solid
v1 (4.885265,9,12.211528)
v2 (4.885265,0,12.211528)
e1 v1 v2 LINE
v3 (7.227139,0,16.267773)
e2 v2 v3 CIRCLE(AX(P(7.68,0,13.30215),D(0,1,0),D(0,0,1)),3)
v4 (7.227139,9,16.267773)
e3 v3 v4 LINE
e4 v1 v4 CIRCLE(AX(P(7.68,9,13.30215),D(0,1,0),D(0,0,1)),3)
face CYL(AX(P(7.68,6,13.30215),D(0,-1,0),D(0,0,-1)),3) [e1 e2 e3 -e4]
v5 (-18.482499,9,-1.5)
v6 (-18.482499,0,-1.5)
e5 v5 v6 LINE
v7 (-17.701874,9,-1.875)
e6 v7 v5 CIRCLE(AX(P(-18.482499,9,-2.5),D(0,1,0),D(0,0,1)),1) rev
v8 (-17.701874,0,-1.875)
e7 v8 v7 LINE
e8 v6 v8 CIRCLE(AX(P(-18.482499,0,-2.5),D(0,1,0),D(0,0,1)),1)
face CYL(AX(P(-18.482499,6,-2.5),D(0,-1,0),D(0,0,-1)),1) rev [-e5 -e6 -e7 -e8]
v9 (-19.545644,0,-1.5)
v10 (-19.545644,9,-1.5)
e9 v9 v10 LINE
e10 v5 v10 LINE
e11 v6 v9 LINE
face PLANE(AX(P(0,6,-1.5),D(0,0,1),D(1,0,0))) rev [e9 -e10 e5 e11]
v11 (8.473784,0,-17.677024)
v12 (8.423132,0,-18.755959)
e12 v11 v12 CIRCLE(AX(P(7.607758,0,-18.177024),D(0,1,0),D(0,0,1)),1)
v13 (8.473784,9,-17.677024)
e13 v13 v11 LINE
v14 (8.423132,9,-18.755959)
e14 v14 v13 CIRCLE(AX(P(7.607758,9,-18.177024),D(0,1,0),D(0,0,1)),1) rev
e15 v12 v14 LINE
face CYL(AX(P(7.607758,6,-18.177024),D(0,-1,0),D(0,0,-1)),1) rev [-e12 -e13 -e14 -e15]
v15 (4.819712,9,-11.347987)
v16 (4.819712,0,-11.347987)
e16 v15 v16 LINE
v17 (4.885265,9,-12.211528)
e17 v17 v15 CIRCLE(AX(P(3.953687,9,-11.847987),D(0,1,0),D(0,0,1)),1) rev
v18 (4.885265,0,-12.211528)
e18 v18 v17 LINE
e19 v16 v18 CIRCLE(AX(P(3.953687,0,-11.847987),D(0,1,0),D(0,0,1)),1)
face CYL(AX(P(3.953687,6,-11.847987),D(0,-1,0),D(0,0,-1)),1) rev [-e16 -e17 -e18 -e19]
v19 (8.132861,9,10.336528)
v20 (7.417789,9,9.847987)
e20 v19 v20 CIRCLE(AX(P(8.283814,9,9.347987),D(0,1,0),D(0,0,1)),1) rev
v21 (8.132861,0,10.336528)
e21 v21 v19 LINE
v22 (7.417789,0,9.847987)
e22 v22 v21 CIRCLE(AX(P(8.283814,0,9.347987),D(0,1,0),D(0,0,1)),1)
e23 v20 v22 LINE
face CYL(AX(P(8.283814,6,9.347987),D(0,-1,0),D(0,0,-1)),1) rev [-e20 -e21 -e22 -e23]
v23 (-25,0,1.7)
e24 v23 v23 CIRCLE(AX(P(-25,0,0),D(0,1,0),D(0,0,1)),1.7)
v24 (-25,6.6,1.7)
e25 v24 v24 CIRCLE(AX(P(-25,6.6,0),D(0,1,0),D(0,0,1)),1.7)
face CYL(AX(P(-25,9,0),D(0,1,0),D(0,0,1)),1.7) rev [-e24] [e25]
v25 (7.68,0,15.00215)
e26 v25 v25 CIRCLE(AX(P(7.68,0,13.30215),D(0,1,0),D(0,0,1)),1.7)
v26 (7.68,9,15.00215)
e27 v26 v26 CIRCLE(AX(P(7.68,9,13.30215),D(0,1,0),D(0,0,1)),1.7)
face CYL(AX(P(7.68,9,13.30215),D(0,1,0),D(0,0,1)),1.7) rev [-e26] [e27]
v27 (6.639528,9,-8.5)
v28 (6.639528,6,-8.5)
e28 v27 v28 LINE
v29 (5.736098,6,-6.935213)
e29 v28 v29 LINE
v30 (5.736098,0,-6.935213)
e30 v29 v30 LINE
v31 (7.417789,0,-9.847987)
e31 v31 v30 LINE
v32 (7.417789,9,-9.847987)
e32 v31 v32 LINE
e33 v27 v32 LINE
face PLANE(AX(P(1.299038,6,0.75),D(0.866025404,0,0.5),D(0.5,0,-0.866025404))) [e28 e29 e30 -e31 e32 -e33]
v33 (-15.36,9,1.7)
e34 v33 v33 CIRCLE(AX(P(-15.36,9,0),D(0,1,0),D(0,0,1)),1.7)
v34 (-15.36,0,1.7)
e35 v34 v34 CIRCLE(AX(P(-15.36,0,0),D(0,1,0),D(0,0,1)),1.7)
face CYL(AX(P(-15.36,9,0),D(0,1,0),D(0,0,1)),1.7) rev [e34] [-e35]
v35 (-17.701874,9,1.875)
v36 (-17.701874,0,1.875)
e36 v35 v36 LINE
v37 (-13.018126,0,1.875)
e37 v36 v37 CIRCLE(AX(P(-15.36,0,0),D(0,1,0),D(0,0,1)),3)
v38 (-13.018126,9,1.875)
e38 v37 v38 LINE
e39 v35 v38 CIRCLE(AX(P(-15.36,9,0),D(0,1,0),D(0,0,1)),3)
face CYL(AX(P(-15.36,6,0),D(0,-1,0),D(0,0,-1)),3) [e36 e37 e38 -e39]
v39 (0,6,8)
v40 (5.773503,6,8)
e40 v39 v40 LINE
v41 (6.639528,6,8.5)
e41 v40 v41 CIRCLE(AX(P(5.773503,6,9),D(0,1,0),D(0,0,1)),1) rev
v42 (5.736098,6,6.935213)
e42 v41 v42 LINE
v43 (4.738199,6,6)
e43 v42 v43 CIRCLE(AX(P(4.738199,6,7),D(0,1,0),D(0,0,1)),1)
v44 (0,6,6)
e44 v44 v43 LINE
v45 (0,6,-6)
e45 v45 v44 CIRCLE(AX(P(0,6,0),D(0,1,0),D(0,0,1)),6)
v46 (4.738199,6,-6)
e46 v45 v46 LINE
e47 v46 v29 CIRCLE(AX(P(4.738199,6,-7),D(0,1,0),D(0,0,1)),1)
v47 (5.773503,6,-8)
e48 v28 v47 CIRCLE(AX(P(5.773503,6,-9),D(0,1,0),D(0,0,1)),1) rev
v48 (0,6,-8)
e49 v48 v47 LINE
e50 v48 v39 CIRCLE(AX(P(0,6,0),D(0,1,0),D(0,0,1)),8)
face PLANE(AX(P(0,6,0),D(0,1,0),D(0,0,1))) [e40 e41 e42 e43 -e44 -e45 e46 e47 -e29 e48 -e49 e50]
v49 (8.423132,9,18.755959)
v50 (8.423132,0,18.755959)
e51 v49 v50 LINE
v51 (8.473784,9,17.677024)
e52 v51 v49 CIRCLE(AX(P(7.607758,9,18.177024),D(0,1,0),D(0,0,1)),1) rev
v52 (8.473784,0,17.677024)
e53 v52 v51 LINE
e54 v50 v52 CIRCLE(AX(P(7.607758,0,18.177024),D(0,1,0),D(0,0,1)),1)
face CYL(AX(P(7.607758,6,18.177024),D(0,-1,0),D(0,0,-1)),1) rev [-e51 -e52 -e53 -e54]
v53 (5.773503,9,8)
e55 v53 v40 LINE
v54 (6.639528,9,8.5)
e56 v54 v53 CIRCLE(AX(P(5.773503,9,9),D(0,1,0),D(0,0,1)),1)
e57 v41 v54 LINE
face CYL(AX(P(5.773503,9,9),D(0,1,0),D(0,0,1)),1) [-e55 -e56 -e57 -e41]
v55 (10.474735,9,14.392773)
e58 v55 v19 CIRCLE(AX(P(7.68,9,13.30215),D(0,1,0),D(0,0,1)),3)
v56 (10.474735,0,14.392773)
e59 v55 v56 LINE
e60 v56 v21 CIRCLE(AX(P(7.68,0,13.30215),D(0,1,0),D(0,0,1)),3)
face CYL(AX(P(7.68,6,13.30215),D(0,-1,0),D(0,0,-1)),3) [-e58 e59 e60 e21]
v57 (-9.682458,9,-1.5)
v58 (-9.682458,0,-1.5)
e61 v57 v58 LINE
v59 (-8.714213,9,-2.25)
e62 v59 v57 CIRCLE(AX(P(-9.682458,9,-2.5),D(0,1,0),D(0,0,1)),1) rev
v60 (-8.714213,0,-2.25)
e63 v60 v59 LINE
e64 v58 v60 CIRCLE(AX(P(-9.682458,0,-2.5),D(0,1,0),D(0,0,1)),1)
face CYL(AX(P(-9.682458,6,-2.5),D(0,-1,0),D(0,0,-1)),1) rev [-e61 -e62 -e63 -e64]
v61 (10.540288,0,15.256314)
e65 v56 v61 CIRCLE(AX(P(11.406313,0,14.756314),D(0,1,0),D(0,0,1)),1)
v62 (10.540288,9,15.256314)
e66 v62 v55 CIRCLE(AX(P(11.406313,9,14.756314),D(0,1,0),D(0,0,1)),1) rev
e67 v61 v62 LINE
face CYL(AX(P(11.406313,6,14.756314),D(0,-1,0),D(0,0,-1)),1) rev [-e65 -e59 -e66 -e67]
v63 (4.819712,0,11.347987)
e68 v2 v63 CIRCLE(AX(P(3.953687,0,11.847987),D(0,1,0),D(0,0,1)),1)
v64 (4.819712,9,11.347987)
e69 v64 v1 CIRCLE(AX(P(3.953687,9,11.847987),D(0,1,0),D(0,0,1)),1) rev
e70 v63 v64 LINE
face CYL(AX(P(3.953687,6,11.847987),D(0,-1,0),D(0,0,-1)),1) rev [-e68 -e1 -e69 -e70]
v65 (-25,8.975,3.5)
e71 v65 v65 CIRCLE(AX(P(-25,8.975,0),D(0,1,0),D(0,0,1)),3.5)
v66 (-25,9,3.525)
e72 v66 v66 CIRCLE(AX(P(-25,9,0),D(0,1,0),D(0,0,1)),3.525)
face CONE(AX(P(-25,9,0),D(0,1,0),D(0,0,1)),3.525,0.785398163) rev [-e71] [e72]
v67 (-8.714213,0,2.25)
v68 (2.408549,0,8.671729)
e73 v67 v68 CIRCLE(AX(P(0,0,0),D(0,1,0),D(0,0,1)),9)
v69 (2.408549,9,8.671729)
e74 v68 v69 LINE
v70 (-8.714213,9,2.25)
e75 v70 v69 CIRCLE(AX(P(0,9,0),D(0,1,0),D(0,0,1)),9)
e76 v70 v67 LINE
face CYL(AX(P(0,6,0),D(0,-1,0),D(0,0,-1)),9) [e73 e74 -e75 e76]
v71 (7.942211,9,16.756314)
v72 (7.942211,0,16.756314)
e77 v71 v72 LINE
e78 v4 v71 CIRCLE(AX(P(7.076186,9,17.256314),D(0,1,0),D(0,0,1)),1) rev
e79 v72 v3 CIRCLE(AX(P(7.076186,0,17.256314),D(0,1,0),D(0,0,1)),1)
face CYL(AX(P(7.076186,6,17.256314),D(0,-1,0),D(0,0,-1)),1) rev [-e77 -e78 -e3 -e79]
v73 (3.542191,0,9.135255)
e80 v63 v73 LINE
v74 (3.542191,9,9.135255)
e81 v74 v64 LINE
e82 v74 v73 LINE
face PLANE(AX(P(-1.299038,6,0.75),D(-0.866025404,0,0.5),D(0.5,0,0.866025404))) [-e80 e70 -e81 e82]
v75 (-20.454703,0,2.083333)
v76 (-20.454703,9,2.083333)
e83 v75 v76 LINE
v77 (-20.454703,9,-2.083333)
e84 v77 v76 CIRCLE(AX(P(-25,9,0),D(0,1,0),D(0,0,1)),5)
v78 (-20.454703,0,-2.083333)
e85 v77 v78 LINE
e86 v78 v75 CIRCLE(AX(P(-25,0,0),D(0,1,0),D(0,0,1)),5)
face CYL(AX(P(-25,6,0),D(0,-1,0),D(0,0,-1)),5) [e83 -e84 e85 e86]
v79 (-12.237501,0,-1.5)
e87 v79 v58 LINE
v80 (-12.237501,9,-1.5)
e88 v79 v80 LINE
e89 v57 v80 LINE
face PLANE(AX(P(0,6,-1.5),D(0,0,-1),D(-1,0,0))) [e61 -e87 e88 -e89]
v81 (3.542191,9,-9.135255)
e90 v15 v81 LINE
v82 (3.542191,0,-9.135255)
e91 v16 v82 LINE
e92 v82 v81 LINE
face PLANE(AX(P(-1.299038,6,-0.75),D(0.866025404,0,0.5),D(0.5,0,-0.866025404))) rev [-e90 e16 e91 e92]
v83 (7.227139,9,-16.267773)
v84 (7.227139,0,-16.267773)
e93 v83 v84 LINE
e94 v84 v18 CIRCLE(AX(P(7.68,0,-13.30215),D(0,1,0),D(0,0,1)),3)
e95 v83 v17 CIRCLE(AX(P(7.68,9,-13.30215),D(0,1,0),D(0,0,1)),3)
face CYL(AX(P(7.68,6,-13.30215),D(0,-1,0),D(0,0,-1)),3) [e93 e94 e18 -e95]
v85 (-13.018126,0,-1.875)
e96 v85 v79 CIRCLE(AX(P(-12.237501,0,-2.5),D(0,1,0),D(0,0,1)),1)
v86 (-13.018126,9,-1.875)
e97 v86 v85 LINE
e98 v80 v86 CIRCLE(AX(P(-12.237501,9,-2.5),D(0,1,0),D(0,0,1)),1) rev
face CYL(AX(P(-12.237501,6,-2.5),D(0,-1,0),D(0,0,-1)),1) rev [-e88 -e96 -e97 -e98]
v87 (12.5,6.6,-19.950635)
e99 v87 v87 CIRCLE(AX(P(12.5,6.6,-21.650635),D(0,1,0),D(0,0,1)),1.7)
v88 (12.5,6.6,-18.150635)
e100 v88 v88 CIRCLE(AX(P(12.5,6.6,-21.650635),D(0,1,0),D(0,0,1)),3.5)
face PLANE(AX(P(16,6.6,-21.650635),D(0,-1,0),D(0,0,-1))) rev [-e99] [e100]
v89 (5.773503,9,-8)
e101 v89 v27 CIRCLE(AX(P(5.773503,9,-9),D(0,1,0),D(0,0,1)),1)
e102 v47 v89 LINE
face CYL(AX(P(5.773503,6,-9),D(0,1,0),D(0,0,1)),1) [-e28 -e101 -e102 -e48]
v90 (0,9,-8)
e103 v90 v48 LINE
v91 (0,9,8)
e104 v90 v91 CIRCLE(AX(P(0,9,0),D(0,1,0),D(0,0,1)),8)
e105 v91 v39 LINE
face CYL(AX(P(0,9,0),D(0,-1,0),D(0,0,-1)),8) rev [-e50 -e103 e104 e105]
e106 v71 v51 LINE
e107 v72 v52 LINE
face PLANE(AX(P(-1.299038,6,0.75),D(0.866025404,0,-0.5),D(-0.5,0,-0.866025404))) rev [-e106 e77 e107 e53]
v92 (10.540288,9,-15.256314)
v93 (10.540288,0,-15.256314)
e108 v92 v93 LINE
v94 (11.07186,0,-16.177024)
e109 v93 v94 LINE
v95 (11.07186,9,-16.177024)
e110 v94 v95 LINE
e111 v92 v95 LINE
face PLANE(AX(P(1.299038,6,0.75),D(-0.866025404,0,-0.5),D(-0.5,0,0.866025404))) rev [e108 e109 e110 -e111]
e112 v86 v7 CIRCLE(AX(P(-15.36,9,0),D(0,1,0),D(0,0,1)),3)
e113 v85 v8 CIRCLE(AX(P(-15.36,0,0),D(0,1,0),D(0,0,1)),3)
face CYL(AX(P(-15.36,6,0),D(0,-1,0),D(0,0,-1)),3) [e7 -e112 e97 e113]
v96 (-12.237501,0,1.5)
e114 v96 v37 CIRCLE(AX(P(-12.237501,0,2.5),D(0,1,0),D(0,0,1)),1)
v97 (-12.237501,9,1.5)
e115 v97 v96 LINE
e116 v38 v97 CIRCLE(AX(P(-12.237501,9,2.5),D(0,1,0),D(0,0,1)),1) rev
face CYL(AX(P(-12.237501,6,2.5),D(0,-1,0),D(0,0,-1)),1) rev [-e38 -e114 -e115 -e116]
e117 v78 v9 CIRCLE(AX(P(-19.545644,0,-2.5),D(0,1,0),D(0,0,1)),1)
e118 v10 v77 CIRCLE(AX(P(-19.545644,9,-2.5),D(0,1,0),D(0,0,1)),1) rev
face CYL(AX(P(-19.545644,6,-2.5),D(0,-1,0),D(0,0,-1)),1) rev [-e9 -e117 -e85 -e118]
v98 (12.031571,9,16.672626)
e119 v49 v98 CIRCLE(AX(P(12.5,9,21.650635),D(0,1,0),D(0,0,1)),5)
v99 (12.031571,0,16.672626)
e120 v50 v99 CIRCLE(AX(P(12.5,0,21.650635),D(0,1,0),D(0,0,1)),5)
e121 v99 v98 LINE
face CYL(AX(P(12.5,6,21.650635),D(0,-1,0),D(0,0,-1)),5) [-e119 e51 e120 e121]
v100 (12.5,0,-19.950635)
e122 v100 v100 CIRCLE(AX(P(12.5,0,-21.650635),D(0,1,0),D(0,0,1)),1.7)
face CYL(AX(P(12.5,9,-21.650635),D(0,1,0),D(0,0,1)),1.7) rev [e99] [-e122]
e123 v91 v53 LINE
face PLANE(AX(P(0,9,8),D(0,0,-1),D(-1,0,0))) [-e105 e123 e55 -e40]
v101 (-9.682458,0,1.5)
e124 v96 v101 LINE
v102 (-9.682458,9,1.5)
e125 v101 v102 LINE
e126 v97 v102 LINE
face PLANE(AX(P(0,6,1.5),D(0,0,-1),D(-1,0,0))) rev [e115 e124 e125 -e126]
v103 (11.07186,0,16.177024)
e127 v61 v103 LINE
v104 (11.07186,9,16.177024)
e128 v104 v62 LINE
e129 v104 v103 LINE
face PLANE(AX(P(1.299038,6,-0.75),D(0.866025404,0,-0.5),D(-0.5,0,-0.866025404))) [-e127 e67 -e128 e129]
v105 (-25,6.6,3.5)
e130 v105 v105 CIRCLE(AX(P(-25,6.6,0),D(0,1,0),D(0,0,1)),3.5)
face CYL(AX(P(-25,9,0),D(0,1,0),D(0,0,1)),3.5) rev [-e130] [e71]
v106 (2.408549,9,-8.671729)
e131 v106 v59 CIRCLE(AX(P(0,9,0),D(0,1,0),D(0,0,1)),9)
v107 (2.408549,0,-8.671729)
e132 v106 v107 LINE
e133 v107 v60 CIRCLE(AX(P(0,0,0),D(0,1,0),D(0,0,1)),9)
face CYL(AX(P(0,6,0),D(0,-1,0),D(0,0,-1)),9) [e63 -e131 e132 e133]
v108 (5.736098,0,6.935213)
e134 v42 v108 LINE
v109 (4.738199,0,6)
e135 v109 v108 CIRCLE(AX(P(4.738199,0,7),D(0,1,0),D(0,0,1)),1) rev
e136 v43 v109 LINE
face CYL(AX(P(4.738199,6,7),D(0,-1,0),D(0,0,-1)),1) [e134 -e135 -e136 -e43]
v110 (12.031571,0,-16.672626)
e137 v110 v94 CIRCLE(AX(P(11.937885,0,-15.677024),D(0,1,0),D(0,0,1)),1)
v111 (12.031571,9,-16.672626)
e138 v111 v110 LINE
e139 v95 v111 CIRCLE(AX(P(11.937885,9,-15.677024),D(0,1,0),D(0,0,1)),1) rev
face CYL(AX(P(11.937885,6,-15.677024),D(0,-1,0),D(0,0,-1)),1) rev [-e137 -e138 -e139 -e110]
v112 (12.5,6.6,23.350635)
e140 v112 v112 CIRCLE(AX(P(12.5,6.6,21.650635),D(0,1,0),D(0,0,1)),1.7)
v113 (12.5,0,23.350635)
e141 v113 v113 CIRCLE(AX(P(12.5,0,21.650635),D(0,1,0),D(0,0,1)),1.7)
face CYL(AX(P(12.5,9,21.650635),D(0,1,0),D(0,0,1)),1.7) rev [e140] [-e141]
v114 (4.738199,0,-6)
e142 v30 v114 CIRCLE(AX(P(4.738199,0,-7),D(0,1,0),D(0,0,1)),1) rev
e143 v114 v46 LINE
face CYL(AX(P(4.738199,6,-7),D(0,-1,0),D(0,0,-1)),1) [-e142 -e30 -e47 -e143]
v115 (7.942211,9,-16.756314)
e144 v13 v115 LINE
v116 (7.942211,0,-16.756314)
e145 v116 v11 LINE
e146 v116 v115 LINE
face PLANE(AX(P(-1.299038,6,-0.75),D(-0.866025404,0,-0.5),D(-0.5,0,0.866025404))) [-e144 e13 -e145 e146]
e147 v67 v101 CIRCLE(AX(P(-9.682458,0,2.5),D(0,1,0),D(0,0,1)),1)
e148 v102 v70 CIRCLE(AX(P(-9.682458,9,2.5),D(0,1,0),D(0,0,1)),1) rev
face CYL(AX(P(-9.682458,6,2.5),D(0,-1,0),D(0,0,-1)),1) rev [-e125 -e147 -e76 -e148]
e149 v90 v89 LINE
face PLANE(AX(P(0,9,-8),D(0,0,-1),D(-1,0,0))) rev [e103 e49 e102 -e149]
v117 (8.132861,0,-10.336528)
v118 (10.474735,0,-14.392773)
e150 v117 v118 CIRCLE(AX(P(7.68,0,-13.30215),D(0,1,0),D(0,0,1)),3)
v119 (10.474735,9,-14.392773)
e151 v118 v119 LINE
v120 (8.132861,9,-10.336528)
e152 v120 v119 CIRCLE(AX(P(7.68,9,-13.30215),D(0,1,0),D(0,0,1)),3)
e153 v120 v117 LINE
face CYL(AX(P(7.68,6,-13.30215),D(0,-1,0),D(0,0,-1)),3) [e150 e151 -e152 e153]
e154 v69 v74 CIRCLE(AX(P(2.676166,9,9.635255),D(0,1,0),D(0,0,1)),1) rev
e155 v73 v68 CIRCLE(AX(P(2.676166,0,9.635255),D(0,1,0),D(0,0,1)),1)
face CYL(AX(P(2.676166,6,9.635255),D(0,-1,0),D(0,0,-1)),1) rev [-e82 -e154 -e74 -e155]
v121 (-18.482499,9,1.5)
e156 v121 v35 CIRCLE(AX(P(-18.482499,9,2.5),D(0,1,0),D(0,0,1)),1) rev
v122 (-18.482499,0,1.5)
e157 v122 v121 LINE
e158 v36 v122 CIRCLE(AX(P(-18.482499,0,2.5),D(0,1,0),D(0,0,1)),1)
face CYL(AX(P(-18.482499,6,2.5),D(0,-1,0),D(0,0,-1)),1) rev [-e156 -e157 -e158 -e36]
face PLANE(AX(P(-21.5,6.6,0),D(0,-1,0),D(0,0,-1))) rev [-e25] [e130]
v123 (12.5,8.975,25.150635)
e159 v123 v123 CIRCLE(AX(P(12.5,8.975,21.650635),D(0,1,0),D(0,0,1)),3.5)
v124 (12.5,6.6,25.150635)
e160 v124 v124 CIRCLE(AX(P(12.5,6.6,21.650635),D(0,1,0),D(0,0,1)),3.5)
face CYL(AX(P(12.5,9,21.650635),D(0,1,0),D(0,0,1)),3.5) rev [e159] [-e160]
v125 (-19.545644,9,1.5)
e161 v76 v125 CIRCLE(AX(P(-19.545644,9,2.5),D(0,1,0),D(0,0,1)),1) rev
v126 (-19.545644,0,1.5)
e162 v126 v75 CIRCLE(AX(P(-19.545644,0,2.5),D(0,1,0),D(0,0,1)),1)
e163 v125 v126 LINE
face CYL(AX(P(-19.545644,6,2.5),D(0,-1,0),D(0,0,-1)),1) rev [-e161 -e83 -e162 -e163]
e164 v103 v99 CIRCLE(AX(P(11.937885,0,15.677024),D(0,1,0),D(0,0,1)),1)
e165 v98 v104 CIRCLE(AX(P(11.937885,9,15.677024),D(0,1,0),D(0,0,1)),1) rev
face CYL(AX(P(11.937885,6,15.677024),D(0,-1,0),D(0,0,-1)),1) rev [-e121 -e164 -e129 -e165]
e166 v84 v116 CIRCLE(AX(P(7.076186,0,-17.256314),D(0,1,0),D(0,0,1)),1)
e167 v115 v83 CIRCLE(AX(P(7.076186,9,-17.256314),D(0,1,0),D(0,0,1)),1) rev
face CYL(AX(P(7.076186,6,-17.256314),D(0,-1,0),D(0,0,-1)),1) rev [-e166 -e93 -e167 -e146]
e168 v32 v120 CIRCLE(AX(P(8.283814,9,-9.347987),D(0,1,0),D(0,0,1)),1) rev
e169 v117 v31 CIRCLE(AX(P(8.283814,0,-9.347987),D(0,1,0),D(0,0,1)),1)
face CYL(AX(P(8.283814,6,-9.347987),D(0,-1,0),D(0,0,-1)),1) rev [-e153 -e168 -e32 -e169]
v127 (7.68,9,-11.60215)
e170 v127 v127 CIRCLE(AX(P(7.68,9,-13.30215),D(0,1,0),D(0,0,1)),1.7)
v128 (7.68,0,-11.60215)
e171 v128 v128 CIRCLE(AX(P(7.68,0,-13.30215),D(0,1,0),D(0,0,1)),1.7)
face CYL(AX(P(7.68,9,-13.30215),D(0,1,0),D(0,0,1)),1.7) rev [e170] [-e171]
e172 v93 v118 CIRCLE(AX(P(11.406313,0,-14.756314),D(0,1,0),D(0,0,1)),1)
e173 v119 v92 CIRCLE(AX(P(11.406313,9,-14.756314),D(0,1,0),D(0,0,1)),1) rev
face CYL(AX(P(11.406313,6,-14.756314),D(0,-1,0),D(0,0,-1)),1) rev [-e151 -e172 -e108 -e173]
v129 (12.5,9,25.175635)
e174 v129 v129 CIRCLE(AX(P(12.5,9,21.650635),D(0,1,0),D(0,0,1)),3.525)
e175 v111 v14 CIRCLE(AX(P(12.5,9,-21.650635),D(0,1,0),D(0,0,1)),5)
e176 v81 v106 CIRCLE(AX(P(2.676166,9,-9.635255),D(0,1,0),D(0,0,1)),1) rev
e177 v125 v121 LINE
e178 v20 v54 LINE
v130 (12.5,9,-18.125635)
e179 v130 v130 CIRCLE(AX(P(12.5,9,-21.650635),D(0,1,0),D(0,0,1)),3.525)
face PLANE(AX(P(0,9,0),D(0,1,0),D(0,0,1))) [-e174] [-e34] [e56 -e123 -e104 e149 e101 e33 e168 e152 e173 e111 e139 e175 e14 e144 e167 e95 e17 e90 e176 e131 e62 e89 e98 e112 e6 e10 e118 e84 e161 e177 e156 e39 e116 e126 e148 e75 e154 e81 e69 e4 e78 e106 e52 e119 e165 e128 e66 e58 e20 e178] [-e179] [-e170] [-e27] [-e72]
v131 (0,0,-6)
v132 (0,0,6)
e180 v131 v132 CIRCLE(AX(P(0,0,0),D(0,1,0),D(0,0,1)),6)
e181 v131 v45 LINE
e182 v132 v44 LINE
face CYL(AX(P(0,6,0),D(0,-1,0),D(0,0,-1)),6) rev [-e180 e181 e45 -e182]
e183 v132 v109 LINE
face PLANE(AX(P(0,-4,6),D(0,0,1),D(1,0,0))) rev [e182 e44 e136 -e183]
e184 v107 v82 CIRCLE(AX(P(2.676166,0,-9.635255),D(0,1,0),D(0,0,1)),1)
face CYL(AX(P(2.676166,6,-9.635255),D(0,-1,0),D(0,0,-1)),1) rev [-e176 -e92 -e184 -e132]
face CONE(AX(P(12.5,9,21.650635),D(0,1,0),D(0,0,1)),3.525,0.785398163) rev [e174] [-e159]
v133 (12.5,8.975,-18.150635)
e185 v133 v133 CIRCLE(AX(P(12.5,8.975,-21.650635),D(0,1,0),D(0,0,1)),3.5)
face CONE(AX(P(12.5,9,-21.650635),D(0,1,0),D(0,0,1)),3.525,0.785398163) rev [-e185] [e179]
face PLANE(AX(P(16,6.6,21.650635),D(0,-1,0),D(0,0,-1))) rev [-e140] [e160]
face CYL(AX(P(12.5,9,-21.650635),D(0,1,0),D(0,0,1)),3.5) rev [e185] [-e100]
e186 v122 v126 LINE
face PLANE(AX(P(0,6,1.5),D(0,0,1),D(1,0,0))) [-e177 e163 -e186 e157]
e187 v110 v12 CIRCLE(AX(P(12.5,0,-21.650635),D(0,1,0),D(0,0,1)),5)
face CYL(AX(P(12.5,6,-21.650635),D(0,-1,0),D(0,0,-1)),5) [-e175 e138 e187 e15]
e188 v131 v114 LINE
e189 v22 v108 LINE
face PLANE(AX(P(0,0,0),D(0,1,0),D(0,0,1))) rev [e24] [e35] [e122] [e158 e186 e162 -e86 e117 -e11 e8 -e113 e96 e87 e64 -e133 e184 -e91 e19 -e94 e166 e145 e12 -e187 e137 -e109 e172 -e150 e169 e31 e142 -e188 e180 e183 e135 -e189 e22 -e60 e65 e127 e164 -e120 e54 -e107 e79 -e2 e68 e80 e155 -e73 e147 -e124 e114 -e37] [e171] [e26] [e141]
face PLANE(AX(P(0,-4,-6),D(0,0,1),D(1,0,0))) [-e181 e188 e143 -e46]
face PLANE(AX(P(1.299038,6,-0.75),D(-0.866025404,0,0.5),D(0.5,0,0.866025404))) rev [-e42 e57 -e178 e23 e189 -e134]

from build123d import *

# Parameters (mm, degrees)
BOSS_EXTRUDE1_DEPTH                           = 6
CUT_EXTRUDE1_START                            = -10
CUT_EXTRUDE1_DEPTH                            = 10
BOSS_EXTRUDE2_DEPTH                           = 3
FILLET1_R                                     = 1
M3_CLEARANCE_HOLE2_D                          = 3.4
CBORE_FOR_M3_PAN_HEAD_MACHINE_SCREW1_AT_COUNT = 2
CBORE_FOR_M3_PAN_HEAD_MACHINE_SCREW1_AT_PITCH = 43.301270189
CBORE_FOR_M3_PAN_HEAD_MACHINE_SCREW1_2_COUNT  = 2
CBORE_FOR_M3_PAN_HEAD_MACHINE_SCREW1_2_PITCH  = 43.301270189


with BuildPart() as part:
    # Sketch1 → Boss-Extrude1 (new body)
    with BuildSketch(Plane(origin=(0, 0, 0), x_dir=(1, 0, 0), z_dir=(0, 1, 0))):
        with BuildLine():
            Line((-5.809475019, -1.5), (-8.874119675, -1.5))
            ThreePointArc((-8.874119675, -1.5), (-4.5, -7.794228634), (3.138021732, -8.435213074))
            Line((3.138021732, -8.435213074), (1.605699404, -5.781152949))
            ThreePointArc((1.605699404, -5.781152949), (-3, -5.196152423), (-5.809475019, -1.5))
        make_face()
        with BuildLine():
            Line((-5.809475019, 1.5), (-8.874119675, 1.5))
            ThreePointArc((-8.874119675, 1.5), (-9, 0), (-8.874119675, -1.5))
            Line((-8.874119675, -1.5), (-5.809475019, -1.5))
            ThreePointArc((-5.809475019, -1.5), (-6, 0), (-5.809475019, 1.5))
        make_face()
        with BuildLine():
            Line((1.605699404, 5.781152949), (3.138021732, 8.435213074))
            ThreePointArc((3.138021732, 8.435213074), (-4.5, 7.794228634), (-8.874119675, 1.5))
            Line((-8.874119675, 1.5), (-5.809475019, 1.5))
            ThreePointArc((-5.809475019, 1.5), (-3, 5.196152423), (1.605699404, 5.781152949))
        make_face()
        with BuildLine():
            ThreePointArc((5.736097943, 6.935213074), (4.5, 7.794228634), (3.138021732, 8.435213074))
            Line((3.138021732, 8.435213074), (1.605699404, 5.781152949))
            ThreePointArc((1.605699404, 5.781152949), (3, 5.196152423), (4.203775615, 4.281152949))
            Line((4.203775615, 4.281152949), (5.736097943, 6.935213074))
        make_face()
        with BuildLine():
            ThreePointArc((9, 0), (8.143245099, 3.83243516), (5.736097943, 6.935213074))
            Line((5.736097943, 6.935213074), (4.203775615, 4.281152949))
            ThreePointArc((4.203775615, 4.281152949), (5.532750387, 2.321351579), (6, 0))
            ThreePointArc((6, 0), (5.532750387, -2.321351579), (4.203775615, -4.281152949))
            Line((4.203775615, -4.281152949), (5.736097943, -6.935213074))
            ThreePointArc((5.736097943, -6.935213074), (8.143245099, -3.83243516), (9, 0))
        make_face()
        with BuildLine():
            ThreePointArc((3.138021732, -8.435213074), (4.5, -7.794228634), (5.736097943, -6.935213074))
            Line((5.736097943, -6.935213074), (4.203775615, -4.281152949))
            ThreePointArc((4.203775615, -4.281152949), (3, -5.196152423), (1.605699404, -5.781152949))
            Line((1.605699404, -5.781152949), (3.138021732, -8.435213074))
        make_face()
        with BuildLine():
            ThreePointArc((-8.874119675, -1.5), (-9, 0), (-8.874119675, 1.5))
            Line((-8.874119675, 1.5), (-12.761923789, 1.5))
            ThreePointArc((-12.761923789, 1.5), (-12.462222521, 0.776457135), (-12.36, 0))
            ThreePointArc((-12.36, 0), (-12.462222521, -0.776457135), (-12.761923789, -1.5))
            Line((-12.761923789, -1.5), (-8.874119675, -1.5))
        make_face()
        with BuildLine():
            Line((-12.761923789, -1.5), (-12.761923789, 1.5))
            ThreePointArc((-12.761923789, 1.5), (-15.36, 3), (-17.958076211, 1.5))
            Line((-17.958076211, 1.5), (-17.958076211, -1.5))
            ThreePointArc((-17.958076211, -1.5), (-15.36, -3), (-12.761923789, -1.5))
        make_face()
        with BuildLine():
            Line((-17.958076211, -1.5), (-17.958076211, 1.5))
            ThreePointArc((-17.958076211, 1.5), (-18.36, 0), (-17.958076211, -1.5))
        make_face()
        with BuildLine():
            ThreePointArc((-17.958076211, -1.5), (-18.36, 0), (-17.958076211, 1.5))
            Line((-17.958076211, 1.5), (-20.230303993, 1.5))
            ThreePointArc((-20.230303993, 1.5), (-20.057911371, 0.758788496), (-20, 0))
            ThreePointArc((-20, 0), (-20.057911371, -0.758788496), (-20.230303993, -1.5))
            Line((-20.230303993, -1.5), (-17.958076211, -1.5))
        make_face()
        with BuildLine():
            ThreePointArc((-20, 0), (-20.057911371, 0.758788496), (-20.230303993, 1.5))
            Line((-20.230303993, 1.5), (-20.230303993, -1.5))
            ThreePointArc((-20.230303993, -1.5), (-20.057911371, -0.758788496), (-20, 0))
        make_face()
        with BuildLine():
            Line((-20.230303993, -1.5), (-20.230303993, 1.5))
            ThreePointArc((-20.230303993, 1.5), (-30, 0), (-20.230303993, -1.5))
        make_face()
        with BuildLine():
            ThreePointArc((-20, 0), (-20.057911371, 0.758788496), (-20.230303993, 1.5))
            Line((-20.230303993, 1.5), (-20.230303993, -1.5))
            ThreePointArc((-20.230303993, -1.5), (-20.057911371, -0.758788496), (-20, 0))
        make_face()
        with BuildLine():
            Line((-20.230303993, -1.5), (-20.230303993, 1.5))
            ThreePointArc((-20.230303993, 1.5), (-30, 0), (-20.230303993, -1.5))
        make_face()
        with BuildLine():
            Line((7.68, -10.302150202), (5.736097943, -6.935213074))
            ThreePointArc((5.736097943, -6.935213074), (4.5, -7.794228634), (3.138021732, -8.435213074))
            Line((3.138021732, -8.435213074), (5.081923789, -11.802150202))
            ThreePointArc((5.081923789, -11.802150202), (6.18, -10.704073991), (7.68, -10.302150202))
        make_face()
        with BuildLine():
            ThreePointArc((10.68, -13.302150202), (9.801320344, -11.180829859), (7.68, -10.302150202))
            Line((7.68, -10.302150202), (5.081923789, -11.802150202))
            ThreePointArc((5.081923789, -11.802150202), (5.081923789, -14.802150202), (7.68, -16.302150202))
            Line((7.68, -16.302150202), (10.278076211, -14.802150202))
            ThreePointArc((10.278076211, -14.802150202), (10.577777479, -14.078607337), (10.68, -13.302150202))
        make_face()
        with BuildLine():
            Line((5.081923789, -11.802150202), (7.68, -10.302150202))
            ThreePointArc((7.68, -10.302150202), (6.18, -10.704073991), (5.081923789, -11.802150202))
        make_face()
        with BuildLine():
            Line((10.278076211, -14.802150202), (7.68, -16.302150202))
            ThreePointArc((7.68, -16.302150202), (9.18, -15.900226413), (10.278076211, -14.802150202))
        make_face()
        with BuildLine():
            ThreePointArc((10.278076211, -14.802150202), (9.18, -15.900226413), (7.68, -16.302150202))
            Line((7.68, -16.302150202), (8.816113891, -18.269957184))
            ThreePointArc((8.816113891, -18.269957184), (10, -17.320508076), (11.414190102, -16.769957184))
            Line((11.414190102, -16.769957184), (10.278076211, -14.802150202))
        make_face()
        with BuildLine():
            ThreePointArc((11.414190102, -16.769957184), (10, -17.320508076), (8.816113891, -18.269957184))
            Line((8.816113891, -18.269957184), (11.414190102, -16.769957184))
        make_face()
        with BuildLine():
            Line((11.414190102, -16.769957184), (8.816113891, -18.269957184))
            ThreePointArc((8.816113891, -18.269957184), (10.686085799, -26.310003643), (17.5, -21.650635095))
            ThreePointArc((17.5, -21.650635095), (15.628174429, -17.750055042), (11.414190102, -16.769957184))
        make_face()
        with BuildLine():
            ThreePointArc((11.414190102, -16.769957184), (10, -17.320508076), (8.816113891, -18.269957184))
            Line((8.816113891, -18.269957184), (11.414190102, -16.769957184))
        make_face()
        with BuildLine():
            Line((11.414190102, -16.769957184), (8.816113891, -18.269957184))
            ThreePointArc((8.816113891, -18.269957184), (10.686085799, -26.310003643), (17.5, -21.650635095))
            ThreePointArc((17.5, -21.650635095), (15.628174429, -17.750055042), (11.414190102, -16.769957184))
        make_face()
        with BuildLine():
            ThreePointArc((-12.36, 0), (-12.462222521, 0.776457135), (-12.761923789, 1.5))
            Line((-12.761923789, 1.5), (-12.761923789, -1.5))
            ThreePointArc((-12.761923789, -1.5), (-12.462222521, -0.776457135), (-12.36, 0))
        make_face()
        with BuildLine():
            ThreePointArc((7.68, 10.302150202), (6.18, 10.704073991), (5.081923789, 11.802150202))
            Line((5.081923789, 11.802150202), (3.138021732, 8.435213074))
            ThreePointArc((3.138021732, 8.435213074), (4.5, 7.794228634), (5.736097943, 6.935213074))
            Line((5.736097943, 6.935213074), (7.68, 10.302150202))
        make_face()
        with BuildLine():
            Line((7.68, 10.302150202), (5.081923789, 11.802150202))
            ThreePointArc((5.081923789, 11.802150202), (6.18, 10.704073991), (7.68, 10.302150202))
        make_face()
        with BuildLine():
            ThreePointArc((10.68, 13.302150202), (10.577777479, 14.078607337), (10.278076211, 14.802150202))
            Line((10.278076211, 14.802150202), (7.68, 16.302150202))
            ThreePointArc((7.68, 16.302150202), (5.081923789, 14.802150202), (5.081923789, 11.802150202))
            Line((5.081923789, 11.802150202), (7.68, 10.302150202))
            ThreePointArc((7.68, 10.302150202), (9.801320344, 11.180829859), (10.68, 13.302150202))
        make_face()
        with BuildLine():
            Line((7.68, 16.302150202), (10.278076211, 14.802150202))
            ThreePointArc((10.278076211, 14.802150202), (9.18, 15.900226413), (7.68, 16.302150202))
        make_face()
        with BuildLine():
            ThreePointArc((7.68, 16.302150202), (9.18, 15.900226413), (10.278076211, 14.802150202))
            Line((10.278076211, 14.802150202), (11.414190102, 16.769957184))
            ThreePointArc((11.414190102, 16.769957184), (10, 17.320508076), (8.816113891, 18.269957184))
            Line((8.816113891, 18.269957184), (7.68, 16.302150202))
        make_face()
        with BuildLine():
            ThreePointArc((8.816113891, 18.269957184), (10, 17.320508076), (11.414190102, 16.769957184))
            Line((11.414190102, 16.769957184), (8.816113891, 18.269957184))
        make_face()
        with BuildLine():
            Line((8.816113891, 18.269957184), (11.414190102, 16.769957184))
            ThreePointArc((11.414190102, 16.769957184), (15.628174429, 17.750055042), (17.5, 21.650635095))
            ThreePointArc((17.5, 21.650635095), (10.686085799, 26.310003643), (8.816113891, 18.269957184))
        make_face()
        with BuildLine():
            ThreePointArc((8.816113891, 18.269957184), (10, 17.320508076), (11.414190102, 16.769957184))
            Line((11.414190102, 16.769957184), (8.816113891, 18.269957184))
        make_face()
        with BuildLine():
            Line((8.816113891, 18.269957184), (11.414190102, 16.769957184))
            ThreePointArc((11.414190102, 16.769957184), (15.628174429, 17.750055042), (17.5, 21.650635095))
            ThreePointArc((17.5, 21.650635095), (10.686085799, 26.310003643), (8.816113891, 18.269957184))
        make_face()
    extrude(amount=BOSS_EXTRUDE1_DEPTH)

    # Sketch2 → Cut-Extrude1 (cut)
    with BuildSketch(Plane(origin=(0, 6, 0), x_dir=(1, 0, 0), z_dir=(0, 1, 0)).offset(CUT_EXTRUDE1_START)):
        with BuildLine():
            Line((6.708203932, 6), (0, 6))
            ThreePointArc((0, 6), (4.242640687, 4.242640687), (6, 0))
            ThreePointArc((6, 0), (4.242640687, -4.242640687), (0, -6))
            Line((0, -6), (6.708203932, -6))
            ThreePointArc((6.708203932, -6), (8.407551231, -3.211398808), (9, 0))
            ThreePointArc((9, 0), (8.407551231, 3.211398808), (6.708203932, 6))
        make_face()
    extrude(amount=CUT_EXTRUDE1_DEPTH, mode=Mode.SUBTRACT)

    # Sketch3 → Boss-Extrude2 (add)
    with BuildSketch(Plane(origin=(0, 6, 0), x_dir=(1, 0, 0), z_dir=(0, 1, 0))):
        with BuildLine():
            ThreePointArc((0, -8), (-8, 0), (0, 8))
            Line((0, 8), (6.350852961, 8))
            Line((6.350852961, 8), (7.68, 10.302150202))
            ThreePointArc((7.68, 10.302150202), (10.278076211, 11.802150202), (10.278076211, 14.802150202))
            Line((10.278076211, 14.802150202), (11.414190102, 16.769957184))
            ThreePointArc((11.414190102, 16.769957184), (15, 25.980762114), (8.816113891, 18.269957184))
            Line((8.816113891, 18.269957184), (7.68, 16.302150202))
            ThreePointArc((7.68, 16.302150202), (5.081923789, 14.802150202), (5.081923789, 11.802150202))
            Line((5.081923789, 11.802150202), (3.138021732, 8.435213074))
            ThreePointArc((3.138021732, 8.435213074), (-4.5, 7.794228634), (-8.874119675, 1.5))
            Line((-8.874119675, 1.5), (-12.761923789, 1.5))
            ThreePointArc((-12.761923789, 1.5), (-15.36, 3), (-17.958076211, 1.5))
            Line((-17.958076211, 1.5), (-20.230303993, 1.5))
            ThreePointArc((-20.230303993, 1.5), (-30, 0), (-20.230303993, -1.5))
            Line((-20.230303993, -1.5), (-17.958076211, -1.5))
            ThreePointArc((-17.958076211, -1.5), (-15.36, -3), (-12.761923789, -1.5))
            Line((-12.761923789, -1.5), (-8.874119675, -1.5))
            ThreePointArc((-8.874119675, -1.5), (-4.5, -7.794228634), (3.138021732, -8.435213074))
            Line((3.138021732, -8.435213074), (5.081923789, -11.802150202))
            ThreePointArc((5.081923789, -11.802150202), (5.081923789, -14.802150202), (7.68, -16.302150202))
            Line((7.68, -16.302150202), (8.816113891, -18.269957184))
            ThreePointArc((8.816113891, -18.269957184), (15, -25.980762114), (11.414190102, -16.769957184))
            Line((11.414190102, -16.769957184), (10.278076211, -14.802150202))
            ThreePointArc((10.278076211, -14.802150202), (10.278076211, -11.802150202), (7.68, -10.302150202))
            Line((7.68, -10.302150202), (6.350852961, -8))
            Line((6.350852961, -8), (0, -8))
        make_face()
    extrude(amount=BOSS_EXTRUDE2_DEPTH)

    # Fillet1
    # the kernel refuses this fillet: 1 mm, written as the material it adds along each edge
    with BuildSketch(Plane(origin=(-17.958076211, 9, 1.5), x_dir=(-1, 0, 0), z_dir=(0, -1, 0)), Plane(origin=(7.68, 9, -16.302150202), x_dir=(0.5000000000000027, 0, -0.866025403784437), z_dir=(0, -1, 0)), Plane(origin=(7.68, 9, -10.302150202), x_dir=(-0.4999999999999965, 0, 0.8660254037844406), z_dir=(0, -1, 0)), Plane(origin=(7.68, 0, 10.302150202), x_dir=(-0.5000000000000009, 0, -0.8660254037844382), z_dir=(0, 1, 0)), Plane(origin=(10.278076211, 9, 14.802150202), x_dir=(0.5000000000000011, 0, 0.8660254037844378), z_dir=(0, -1, 0)), Plane(origin=(5.081923789, 9, 11.802150202), x_dir=(-0.4999999999999978, 0, -0.8660254037844398), z_dir=(0, -1, 0))) as fillet1_piece_1:
        with BuildLine():
            CenterArc((0.524422788, -1), FILLET1_R, 90, 51.317812547)
            ThreePointArc((-0.256201962, -0.375), (-0.120994483, -0.192355197), (0, 0))
            Line((0, 0), (0.524422788, 0))
        make_face()
    extrude(amount=9)
    with BuildSketch(Plane(origin=(-20.230303993, 9, 1.5), x_dir=(-0.3590352743160652, 0, 0.9333239907967585), z_dir=(0, -1, 0)), Plane(origin=(8.816113891, 9, -18.269957184), x_dir=(-0.6287646488334481, 0, -0.7775956638107949), z_dir=(0, -1, 0))) as fillet1_piece_2:
        with BuildLine():
            CenterArc((0.687506882, -0.998044925), FILLET1_R, 93.583357614, 65.375681648)
            Line((-0.245817109, -0.63900965), (0, 0))
            ThreePointArc((0, 0), (0.312503128, -0.009775376), (0.625006256, 0))
        make_face()
    extrude(amount=9)
    with BuildSketch(Plane(origin=(-20.230303993, 9, -1.5), x_dir=(1, 0, 0), z_dir=(0, -1, 0)), Plane(origin=(11.414190102, 9, -16.769957184), x_dir=(-0.49999999999999795, 0, 0.8660254037844398), z_dir=(0, -1, 0))) as fillet1_piece_3:
        with BuildLine():
            CenterArc((0.68466005, -1), FILLET1_R, 90, 65.375681648)
            ThreePointArc((-0.224399293, -0.583333333), (-0.103076053, -0.295176372), (0, 0))
            Line((0, 0), (0.68466005, 0))
        make_face()
    extrude(amount=9)
    with BuildSketch(Plane(origin=(-17.958076211, 9, -1.5), x_dir=(0.5641183988536709, 0, -0.8256939094330118), z_dir=(0, -1, 0)), Plane(origin=(-12.761923789, 0, -1.5), x_dir=(-0.5641183988536762, 0, -0.8256939094330082), z_dir=(0, 1, 0)), Plane(origin=(5.081923789, 9, -11.802150202), x_dir=(-0.4330127018922323, 0, -0.9013878188659912), z_dir=(0, -1, 0)), Plane(origin=(10.278076211, 9, -14.802150202), x_dir=(0.4330127018922199, 0, 0.901387818865997), z_dir=(0, -1, 0)), Plane(origin=(7.68, 9, 16.302150202), x_dir=(-0.9971311007459096, 0, -0.07569390943299635), z_dir=(0, -1, 0)), Plane(origin=(-12.761923789, 9, 1.5), x_dir=(-0.564118398853686, 0, 0.8256939094330015), z_dir=(0, -1, 0))) as fillet1_piece_4:
        with BuildLine():
            CenterArc((0.529857366, -0.997131101), FILLET1_R, 94.341093727, 51.317812547)
            Line((-0.295836543, -0.433012702), (0, 0))
            ThreePointArc((0, 0), (0.227081728, -0.008606698), (0.454163457, 0))
        make_face()
    extrude(amount=9)
    with BuildSketch(Plane(origin=(-8.874119675, 0, -1.5), x_dir=(0.20852265690357363, 0, -0.9780175364265584), z_dir=(0, 1, 0))) as fillet1_piece_5:
        with BuildLine():
            CenterArc((0.809460605, 0.999092072), FILLET1_R, 192.035790206, 75.522487814)
            Line((-0.168556931, 0.790569415), (0, 0))
            ThreePointArc((0, 0), (0.383428708, 0.008171352), (0.766857415, 0))
        make_face()
    extrude(amount=6)
    with BuildSketch(Plane(origin=(3.138021732, 0, -8.435213074), x_dir=(-0.9512493603438537, 0, -0.3084228500701743), z_dir=(0, 1, 0))) as fillet1_piece_6:
        with BuildLine():
            CenterArc((0.809460605, -0.999092072), FILLET1_R, 92.44172198, 75.522487814)
            Line((-0.168556931, -0.790569415), (0, 0))
            ThreePointArc((0, 0), (0.383428708, -0.008171352), (0.766857415, 0))
        make_face()
    extrude(amount=6)
    with BuildSketch(Plane(origin=(11.414190102, 0, 16.769957184), x_dir=(0.9877999231494978, 0, -0.15572832698595993), z_dir=(0, 1, 0))) as fillet1_piece_7:
        with BuildLine():
            CenterArc((0.687506882, 0.998044925), FILLET1_R, 201.040960738, 65.375681648)
            Line((-0.245817109, 0.63900965), (0, 0))
            ThreePointArc((0, 0), (0.312503128, 0.009775376), (0.625006256, 0))
        make_face()
    extrude(amount=6)
    with BuildSketch(Plane(origin=(8.816113891, 0, 18.269957184), x_dir=(-0.5000000000000001, 0, -0.8660254037844385), z_dir=(0, 1, 0))) as fillet1_piece_8:
        with BuildLine():
            CenterArc((0.68466005, 1), FILLET1_R, 204.624318352, 65.375681648)
            ThreePointArc((-0.224399293, 0.583333333), (-0.103076053, 0.295176372), (0, 0))
            Line((0, 0), (0.68466005, 0))
        make_face()
    extrude(amount=9)
    with BuildSketch(Plane(origin=(3.138021732, 9, 8.435213074), x_dir=(-0.9512493603438466, -1.3775500415435472e-14, 0.3084228500701963), z_dir=(0, -1, 0))) as fillet1_piece_9:
        with BuildLine():
            CenterArc((0.809460605, -0.999092072), FILLET1_R, 92.44172198, 75.522487814)
            Line((-0.168556931, -0.790569415), (0, 0))
            ThreePointArc((0, 0), (0.383428708, -0.008171352), (0.766857415, 0))
        make_face()
    extrude(amount=9)
    with BuildSketch(Plane(origin=(-8.874119675, 9, 1.5), x_dir=(-1, 0, 0), z_dir=(0, -1, 0))) as fillet1_piece_10:
        with BuildLine():
            CenterArc((0.808338691, -1), FILLET1_R, 90, 75.522487814)
            ThreePointArc((-0.159907146, -0.75), (-0.071961847, -0.376703912), (0, 0))
            Line((0, 0), (0.808338691, 0))
        make_face()
    extrude(amount=9)
    with BuildSketch(Plane(origin=(11.414190102, 6, 16.769957184), x_dir=(0.987799923149496, 0, -0.15572832698597144), z_dir=(0, 1, 0))) as fillet1_piece_11:
        with BuildLine():
            CenterArc((0.687506882, 0.998044925), FILLET1_R, 201.040960738, 65.375681648)
            Line((-0.245817109, 0.63900965), (0, 0))
            ThreePointArc((0, 0), (0.312503128, 0.009775376), (0.625006256, 0))
        make_face()
    extrude(amount=3)
    with BuildSketch(Plane(origin=(3.138021732, 6, -8.435213074), x_dir=(-0.9512493603438414, 0, -0.3084228500702117), z_dir=(0, 1, 0))) as fillet1_piece_12:
        with BuildLine():
            CenterArc((0.809460605, -0.999092072), FILLET1_R, 92.44172198, 75.522487814)
            Line((-0.168556931, -0.790569415), (0, 0))
            ThreePointArc((0, 0), (0.383428708, -0.008171352), (0.766857415, 0))
        make_face()
    extrude(amount=3)
    with BuildSketch(Plane(origin=(-8.874119675, 6, -1.5), x_dir=(-1, 0, 0), z_dir=(0, 1, 0))) as fillet1_piece_13:
        with BuildLine():
            CenterArc((0.808338691, -1), FILLET1_R, 90, 75.522487814)
            ThreePointArc((-0.159907146, -0.75), (-0.071961847, -0.376703912), (0, 0))
            Line((0, 0), (0.808338691, 0))
        make_face()
    extrude(amount=3)
    # the kernel refuses this fillet: 1 mm, written as the material it takes off along each edge
    with BuildSketch(Plane(origin=(6.350852961, 6, -8), x_dir=(-1, 0, 0), z_dir=(0, 1, 0)), Plane(origin=(6.350852961, 6, 8), x_dir=(0.5000000000000003, 0, 0.8660254037844385), z_dir=(0, 1, 0))) as fillet1_2_piece_1:
        with BuildLine():
            CenterArc((FILLET1_R * 0.57735026919, -FILLET1_R), FILLET1_R, 90, 60)
            Line((-FILLET1_R * 0.288675134595, -FILLET1_R * 0.5), (0, 0))
            Line((0, 0), (FILLET1_R * 0.57735026919, 0))
        make_face()
    extrude(amount=4.443375673, mode=Mode.SUBTRACT)
    with BuildSketch(Plane(origin=(6.708203932, -4.925012774, -6), x_dir=(-0.720649414209032, 0, -0.6932996623395826), z_dir=(0, 1, 0))) as fillet1_2_piece_2:
        with BuildLine():
            CenterArc((2.112982691, 0.645154463), FILLET1_R, 133.891876666, 86.285380912)
            Line((1.419683028, 1.365803877), (0, 0))
            ThreePointArc((0, 0), (0.67446526, -0.025307993), (1.348930521, 0))
        make_face()
    extrude(amount=15.850025549, mode=Mode.SUBTRACT)
    with BuildSketch(Plane(origin=(6.708203932, -4.925012774, 6), x_dir=(-1, 0, 0), z_dir=(0, 1, 0))) as fillet1_2_piece_3:
        with BuildLine():
            CenterArc((1.97000511, 1), FILLET1_R, 183.714619088, 86.285380912)
            ThreePointArc((0.972105989, 0.935213074), (0.468506971, 0.485844728), (0, 0))
            Line((0, 0), (1.97000511, 0))
        make_face()
    extrude(amount=15.850025549, mode=Mode.SUBTRACT)

    # M3 Clearance Hole2 (through all)
    with Locations(Plane(origin=(0, 9, 0), x_dir=(1, 0, 0), z_dir=(0, 1, 0))):
        with Locations((7.68, 13.302150202), (7.68, -13.302150202), (-15.36, 0)):
            Hole(M3_CLEARANCE_HOLE2_D / 2)

    # Sketch8 → CBORE for M3 Pan Head Machine Screw1 (revolve, cut)
    with BuildSketch(Plane(origin=(12.5, 9, -21.650635095), x_dir=(0, 0, 1), z_dir=(1, 0, 0))):
        Polygon((0, 0), (0, 9), (1.7, 9), (1.7, 2.4), (3.5, 2.4), (3.5, 0.025), (3.525, 0), align=None)
    cbore_for_m3_pan_head_machine_screw1 = revolve(axis=Axis((12.5, 15.35, -21.650635095), (0, -1, 0)), mode=Mode.SUBTRACT)

    # CBORE for M3 Pan Head Machine Screw1 at: CBORE for M3 Pan Head Machine Screw1 ×2
    with Locations(*[(0, 0, i * CBORE_FOR_M3_PAN_HEAD_MACHINE_SCREW1_AT_PITCH) for i in range(1, CBORE_FOR_M3_PAN_HEAD_MACHINE_SCREW1_AT_COUNT)]):
        add(cbore_for_m3_pan_head_machine_screw1, mode=Mode.SUBTRACT)

    # CBORE for M3 Pan Head Machine Screw1 2: CBORE for M3 Pan Head Machine Screw1 ×2
    with Locations(*[Vector(-0.8660254037844387, 0, 0.5000000000000001) * (i * CBORE_FOR_M3_PAN_HEAD_MACHINE_SCREW1_2_PITCH) for i in range(1, CBORE_FOR_M3_PAN_HEAD_MACHINE_SCREW1_2_COUNT)]):
        add(cbore_for_m3_pan_head_machine_screw1, mode=Mode.SUBTRACT)


solid = part.part
